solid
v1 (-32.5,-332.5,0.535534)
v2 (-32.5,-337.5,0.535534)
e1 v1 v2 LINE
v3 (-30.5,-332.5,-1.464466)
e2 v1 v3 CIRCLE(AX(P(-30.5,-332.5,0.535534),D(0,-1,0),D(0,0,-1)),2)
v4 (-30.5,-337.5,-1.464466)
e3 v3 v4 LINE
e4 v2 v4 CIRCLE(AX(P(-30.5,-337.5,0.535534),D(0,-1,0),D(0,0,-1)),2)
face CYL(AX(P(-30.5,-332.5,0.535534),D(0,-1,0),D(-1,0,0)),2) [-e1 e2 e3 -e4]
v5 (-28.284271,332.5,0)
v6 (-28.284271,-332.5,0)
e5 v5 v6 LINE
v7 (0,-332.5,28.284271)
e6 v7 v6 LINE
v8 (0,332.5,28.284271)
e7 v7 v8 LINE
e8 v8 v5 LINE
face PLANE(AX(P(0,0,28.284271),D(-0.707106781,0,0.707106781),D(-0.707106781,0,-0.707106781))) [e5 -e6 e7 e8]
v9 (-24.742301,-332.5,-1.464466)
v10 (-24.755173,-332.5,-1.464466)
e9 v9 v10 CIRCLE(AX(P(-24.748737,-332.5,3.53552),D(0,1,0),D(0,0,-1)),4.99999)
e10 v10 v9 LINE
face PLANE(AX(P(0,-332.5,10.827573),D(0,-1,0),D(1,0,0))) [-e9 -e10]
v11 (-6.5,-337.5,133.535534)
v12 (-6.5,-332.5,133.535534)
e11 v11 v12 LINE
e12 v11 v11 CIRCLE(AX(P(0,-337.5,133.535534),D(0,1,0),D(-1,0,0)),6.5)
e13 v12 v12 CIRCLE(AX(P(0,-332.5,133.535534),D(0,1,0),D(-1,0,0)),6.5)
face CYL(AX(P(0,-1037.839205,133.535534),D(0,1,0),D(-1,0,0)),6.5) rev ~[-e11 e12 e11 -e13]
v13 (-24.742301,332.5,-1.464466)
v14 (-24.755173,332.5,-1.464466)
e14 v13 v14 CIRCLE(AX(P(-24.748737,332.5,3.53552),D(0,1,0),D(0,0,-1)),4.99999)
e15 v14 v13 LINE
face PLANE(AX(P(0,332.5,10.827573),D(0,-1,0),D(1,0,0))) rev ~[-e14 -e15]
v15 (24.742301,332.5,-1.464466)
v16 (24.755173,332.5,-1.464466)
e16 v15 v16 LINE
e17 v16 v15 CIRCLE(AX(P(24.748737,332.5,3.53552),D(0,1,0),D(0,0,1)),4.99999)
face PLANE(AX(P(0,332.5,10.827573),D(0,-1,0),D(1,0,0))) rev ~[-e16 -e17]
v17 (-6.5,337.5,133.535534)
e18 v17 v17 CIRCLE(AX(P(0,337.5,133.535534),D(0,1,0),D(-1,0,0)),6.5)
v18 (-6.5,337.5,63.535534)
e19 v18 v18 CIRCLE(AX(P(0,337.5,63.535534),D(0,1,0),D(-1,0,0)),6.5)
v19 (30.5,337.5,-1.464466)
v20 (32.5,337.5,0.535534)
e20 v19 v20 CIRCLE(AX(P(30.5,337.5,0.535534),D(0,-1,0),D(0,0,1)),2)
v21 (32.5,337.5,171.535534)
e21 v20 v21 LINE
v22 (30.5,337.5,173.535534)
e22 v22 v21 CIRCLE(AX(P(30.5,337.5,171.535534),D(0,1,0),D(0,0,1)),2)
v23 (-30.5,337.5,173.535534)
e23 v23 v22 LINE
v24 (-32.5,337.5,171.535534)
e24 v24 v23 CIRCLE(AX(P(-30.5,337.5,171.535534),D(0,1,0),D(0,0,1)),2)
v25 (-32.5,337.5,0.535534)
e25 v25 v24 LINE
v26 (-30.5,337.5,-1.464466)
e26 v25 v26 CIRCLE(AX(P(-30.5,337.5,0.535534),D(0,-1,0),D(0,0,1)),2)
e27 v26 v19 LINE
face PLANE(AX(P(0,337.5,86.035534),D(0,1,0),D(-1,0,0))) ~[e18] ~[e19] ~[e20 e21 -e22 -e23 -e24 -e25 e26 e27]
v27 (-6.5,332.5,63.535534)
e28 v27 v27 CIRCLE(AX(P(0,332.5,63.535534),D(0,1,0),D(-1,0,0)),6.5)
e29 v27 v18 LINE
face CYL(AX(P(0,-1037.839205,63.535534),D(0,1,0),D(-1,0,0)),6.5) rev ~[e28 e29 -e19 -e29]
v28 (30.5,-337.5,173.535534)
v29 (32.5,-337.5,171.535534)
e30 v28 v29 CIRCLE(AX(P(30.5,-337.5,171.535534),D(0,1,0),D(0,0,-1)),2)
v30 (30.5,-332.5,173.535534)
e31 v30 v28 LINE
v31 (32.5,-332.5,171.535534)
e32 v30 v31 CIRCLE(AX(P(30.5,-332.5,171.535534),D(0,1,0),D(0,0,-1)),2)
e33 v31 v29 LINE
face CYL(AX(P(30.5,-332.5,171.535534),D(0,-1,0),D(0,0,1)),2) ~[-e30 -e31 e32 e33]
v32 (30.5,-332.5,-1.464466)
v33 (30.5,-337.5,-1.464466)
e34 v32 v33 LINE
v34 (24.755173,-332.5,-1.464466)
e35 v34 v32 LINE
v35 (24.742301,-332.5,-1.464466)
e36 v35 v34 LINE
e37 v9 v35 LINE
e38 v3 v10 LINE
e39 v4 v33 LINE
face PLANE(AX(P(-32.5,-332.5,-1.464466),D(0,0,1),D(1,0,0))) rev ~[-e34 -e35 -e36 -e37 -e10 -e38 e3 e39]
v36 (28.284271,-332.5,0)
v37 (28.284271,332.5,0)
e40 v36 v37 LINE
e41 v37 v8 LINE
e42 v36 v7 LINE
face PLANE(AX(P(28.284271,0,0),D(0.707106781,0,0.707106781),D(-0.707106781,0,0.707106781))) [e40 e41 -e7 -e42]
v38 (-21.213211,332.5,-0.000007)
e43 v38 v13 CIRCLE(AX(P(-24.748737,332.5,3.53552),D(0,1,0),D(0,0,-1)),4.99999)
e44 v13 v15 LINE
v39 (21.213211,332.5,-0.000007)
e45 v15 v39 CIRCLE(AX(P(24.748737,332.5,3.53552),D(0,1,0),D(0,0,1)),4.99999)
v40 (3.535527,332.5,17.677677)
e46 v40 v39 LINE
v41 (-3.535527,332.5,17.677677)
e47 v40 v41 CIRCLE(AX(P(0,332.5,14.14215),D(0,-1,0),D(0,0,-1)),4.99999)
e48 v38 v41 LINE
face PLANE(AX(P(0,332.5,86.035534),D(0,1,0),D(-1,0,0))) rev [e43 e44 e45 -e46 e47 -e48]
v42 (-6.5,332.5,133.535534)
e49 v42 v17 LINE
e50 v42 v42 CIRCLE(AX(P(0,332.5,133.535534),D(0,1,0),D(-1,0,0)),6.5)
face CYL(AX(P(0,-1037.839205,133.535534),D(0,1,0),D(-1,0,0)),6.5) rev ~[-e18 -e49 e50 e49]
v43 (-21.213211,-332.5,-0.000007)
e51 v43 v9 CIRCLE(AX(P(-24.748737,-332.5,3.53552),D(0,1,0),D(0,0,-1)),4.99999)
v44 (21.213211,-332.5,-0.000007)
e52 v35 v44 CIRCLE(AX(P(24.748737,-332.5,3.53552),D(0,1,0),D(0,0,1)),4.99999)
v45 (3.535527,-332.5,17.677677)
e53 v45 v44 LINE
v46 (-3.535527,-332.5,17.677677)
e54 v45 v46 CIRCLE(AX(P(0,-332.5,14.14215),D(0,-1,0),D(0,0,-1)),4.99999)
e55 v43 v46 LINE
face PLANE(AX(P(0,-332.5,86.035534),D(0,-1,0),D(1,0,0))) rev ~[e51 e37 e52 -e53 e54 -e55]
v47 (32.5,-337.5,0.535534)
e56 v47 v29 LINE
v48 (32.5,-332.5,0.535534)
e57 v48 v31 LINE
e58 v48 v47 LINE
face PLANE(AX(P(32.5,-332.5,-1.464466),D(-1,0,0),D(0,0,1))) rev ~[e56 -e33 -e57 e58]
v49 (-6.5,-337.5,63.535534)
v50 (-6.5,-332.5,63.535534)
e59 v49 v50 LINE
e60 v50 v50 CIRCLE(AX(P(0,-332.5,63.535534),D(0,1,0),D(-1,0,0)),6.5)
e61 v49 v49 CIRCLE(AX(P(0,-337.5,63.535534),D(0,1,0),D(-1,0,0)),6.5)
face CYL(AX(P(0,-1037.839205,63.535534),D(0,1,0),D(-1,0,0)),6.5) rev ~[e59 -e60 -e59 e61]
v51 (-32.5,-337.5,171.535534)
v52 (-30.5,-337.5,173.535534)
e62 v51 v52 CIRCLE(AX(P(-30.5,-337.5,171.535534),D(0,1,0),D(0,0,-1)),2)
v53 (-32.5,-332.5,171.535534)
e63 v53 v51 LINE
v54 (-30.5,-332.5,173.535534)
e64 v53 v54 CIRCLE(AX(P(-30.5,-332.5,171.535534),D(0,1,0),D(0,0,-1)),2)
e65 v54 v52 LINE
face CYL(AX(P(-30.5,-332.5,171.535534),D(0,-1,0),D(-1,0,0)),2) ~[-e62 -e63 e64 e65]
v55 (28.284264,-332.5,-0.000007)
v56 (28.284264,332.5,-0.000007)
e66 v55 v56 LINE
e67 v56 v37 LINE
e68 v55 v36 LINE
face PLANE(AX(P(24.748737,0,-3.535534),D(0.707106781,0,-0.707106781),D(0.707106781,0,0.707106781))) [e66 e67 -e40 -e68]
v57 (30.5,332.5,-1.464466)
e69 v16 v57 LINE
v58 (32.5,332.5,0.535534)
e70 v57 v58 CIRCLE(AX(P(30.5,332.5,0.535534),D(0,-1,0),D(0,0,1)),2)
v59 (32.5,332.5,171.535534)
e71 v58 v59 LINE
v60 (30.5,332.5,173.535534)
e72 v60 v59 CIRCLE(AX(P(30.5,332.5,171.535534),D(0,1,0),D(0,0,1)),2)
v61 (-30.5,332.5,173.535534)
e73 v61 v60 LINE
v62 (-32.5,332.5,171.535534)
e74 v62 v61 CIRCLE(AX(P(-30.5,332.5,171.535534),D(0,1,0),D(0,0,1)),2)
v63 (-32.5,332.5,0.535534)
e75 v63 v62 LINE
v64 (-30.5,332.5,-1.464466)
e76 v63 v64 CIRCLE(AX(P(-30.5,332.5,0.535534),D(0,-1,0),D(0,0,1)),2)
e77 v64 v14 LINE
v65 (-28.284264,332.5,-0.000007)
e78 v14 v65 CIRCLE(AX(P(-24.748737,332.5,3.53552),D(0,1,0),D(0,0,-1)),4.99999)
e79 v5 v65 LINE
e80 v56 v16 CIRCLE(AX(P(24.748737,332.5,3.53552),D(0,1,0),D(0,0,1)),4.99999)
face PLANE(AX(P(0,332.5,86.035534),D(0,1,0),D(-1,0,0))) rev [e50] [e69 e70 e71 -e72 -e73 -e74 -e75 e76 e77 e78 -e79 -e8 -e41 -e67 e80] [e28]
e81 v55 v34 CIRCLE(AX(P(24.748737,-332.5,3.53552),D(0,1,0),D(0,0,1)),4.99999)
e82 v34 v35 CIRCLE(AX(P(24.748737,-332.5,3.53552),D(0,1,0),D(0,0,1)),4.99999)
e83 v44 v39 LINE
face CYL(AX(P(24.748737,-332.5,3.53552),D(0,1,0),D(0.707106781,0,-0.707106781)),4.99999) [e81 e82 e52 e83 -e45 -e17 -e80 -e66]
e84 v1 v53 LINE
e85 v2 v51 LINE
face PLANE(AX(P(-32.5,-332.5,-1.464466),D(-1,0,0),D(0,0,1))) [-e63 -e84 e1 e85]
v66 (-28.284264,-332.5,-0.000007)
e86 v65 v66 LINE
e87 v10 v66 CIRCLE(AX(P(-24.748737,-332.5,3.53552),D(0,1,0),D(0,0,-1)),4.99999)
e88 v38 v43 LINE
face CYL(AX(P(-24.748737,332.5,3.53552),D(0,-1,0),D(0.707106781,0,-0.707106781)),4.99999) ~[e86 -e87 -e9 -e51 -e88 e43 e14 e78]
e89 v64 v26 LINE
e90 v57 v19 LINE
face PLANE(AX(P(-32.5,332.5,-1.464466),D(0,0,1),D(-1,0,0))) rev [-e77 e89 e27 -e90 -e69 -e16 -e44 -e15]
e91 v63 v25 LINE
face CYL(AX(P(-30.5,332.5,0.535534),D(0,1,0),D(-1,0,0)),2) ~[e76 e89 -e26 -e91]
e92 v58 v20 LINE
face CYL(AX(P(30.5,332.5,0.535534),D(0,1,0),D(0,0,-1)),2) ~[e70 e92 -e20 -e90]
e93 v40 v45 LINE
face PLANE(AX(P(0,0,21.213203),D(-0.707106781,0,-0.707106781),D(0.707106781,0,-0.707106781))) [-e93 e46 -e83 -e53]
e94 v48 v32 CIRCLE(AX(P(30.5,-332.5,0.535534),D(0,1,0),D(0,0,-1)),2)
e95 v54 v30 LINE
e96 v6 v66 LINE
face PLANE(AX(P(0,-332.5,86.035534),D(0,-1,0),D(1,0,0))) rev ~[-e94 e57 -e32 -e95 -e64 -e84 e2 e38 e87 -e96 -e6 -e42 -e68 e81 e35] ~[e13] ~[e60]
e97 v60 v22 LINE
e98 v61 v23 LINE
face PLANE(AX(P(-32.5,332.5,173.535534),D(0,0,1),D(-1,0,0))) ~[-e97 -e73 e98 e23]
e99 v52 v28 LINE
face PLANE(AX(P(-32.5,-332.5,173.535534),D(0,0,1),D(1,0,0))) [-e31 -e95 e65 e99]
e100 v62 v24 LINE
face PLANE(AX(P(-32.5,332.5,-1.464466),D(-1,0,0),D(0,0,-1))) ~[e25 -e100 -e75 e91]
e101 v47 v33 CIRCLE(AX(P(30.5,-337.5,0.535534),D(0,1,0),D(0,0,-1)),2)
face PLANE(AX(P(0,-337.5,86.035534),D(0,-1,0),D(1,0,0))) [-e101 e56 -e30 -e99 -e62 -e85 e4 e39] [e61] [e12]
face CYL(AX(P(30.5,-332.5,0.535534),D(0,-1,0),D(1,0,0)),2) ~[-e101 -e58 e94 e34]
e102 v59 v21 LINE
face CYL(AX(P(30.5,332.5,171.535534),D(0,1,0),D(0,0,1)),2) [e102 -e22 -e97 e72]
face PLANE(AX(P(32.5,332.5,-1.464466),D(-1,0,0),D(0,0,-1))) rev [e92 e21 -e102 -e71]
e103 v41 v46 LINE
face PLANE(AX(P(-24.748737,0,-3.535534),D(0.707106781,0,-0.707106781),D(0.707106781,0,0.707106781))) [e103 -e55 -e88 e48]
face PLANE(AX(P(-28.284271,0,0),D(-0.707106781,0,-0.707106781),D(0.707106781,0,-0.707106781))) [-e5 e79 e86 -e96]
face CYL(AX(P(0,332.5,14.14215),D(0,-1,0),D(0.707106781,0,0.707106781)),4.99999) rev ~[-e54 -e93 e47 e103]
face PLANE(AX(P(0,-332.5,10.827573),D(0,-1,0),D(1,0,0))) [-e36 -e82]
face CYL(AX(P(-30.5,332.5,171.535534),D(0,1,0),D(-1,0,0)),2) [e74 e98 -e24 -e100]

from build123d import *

# Parameters (mm, degrees)
F1_DEPTH      = 332.5
F1_DEPTH_BACK = 332.5
F2_R          = 4.99999
F3_W          = 65
F3_H          = 175
F4_DEPTH      = 5
F5_R          = 2
F7_D          = 13


# Not quite as in the source:
# - a fillet or chamfer is up to 0.001 mm smaller than in the source, because OpenCascade refuses the exact size
# - a pattern or mirror of a feature is missing from the dataset's text; its kind, count and spacing are read off the source's solid
# - a feature names something its author has since deleted; it is built from what else it names


with BuildPart() as f1:
    # F0 (on Front) → F1 (new body, two sides)
    with BuildSketch(Plane.XZ) as f1_sk:
        Polygon((0, 28.2842712475), (-28.2842712475, 0), (-24.7487373415, -3.5355339059), (0, 21.2132034356), (24.7487373415, -3.5355339059), (28.2842712475, 0), align=None)
    extrude(amount=F1_DEPTH)
    extrude(f1_sk.sketch, amount=-F1_DEPTH_BACK)

    # F2 (radius 5 in the source; OpenCascade refuses exactly that, so slightly less here)
    f2_edges = [f1.edges().sort_by_distance(p)[0] for p in [
        (24.748737, 0, -3.535534),
        (0, 0, 21.213203),
        (-24.748737, 0, -3.535534),
    ]]
    fillet(f2_edges, radius=F2_R)

    # F3 (on face) → F4 (join)
    with BuildSketch(Plane.XZ.offset(332.5)):
        with Locations((0, 86.0355339059)):
            Rectangle(F3_W, F3_H)
    f4 = extrude(amount=F4_DEPTH)

    # F4_copies: F4 across plane
    add(f4.mirror(Plane.ZX))

    # F5
    f5_edges = [f1.edges().sort_by_distance(p)[0] for p in [
        (32.5, -335, 173.535534),
        (32.5, -335, -1.464466),
        (-32.5, -335, 173.535534),
        (-32.5, -335, -1.464466),
        (-32.5, 335, -1.464466),
        (32.5, 335, -1.464466),
        (-32.5, 335, 173.535534),
        (32.5, 335, 173.535534),
    ]]
    fillet(f5_edges, radius=F5_R)

    # F7 (through all)
    with Locations(Plane.XZ.offset(337.5)):
        with Locations((0, 63.5355339059), (0, 133.5355339059)):
            Hole(F7_D / 2)


solid = f1.part
